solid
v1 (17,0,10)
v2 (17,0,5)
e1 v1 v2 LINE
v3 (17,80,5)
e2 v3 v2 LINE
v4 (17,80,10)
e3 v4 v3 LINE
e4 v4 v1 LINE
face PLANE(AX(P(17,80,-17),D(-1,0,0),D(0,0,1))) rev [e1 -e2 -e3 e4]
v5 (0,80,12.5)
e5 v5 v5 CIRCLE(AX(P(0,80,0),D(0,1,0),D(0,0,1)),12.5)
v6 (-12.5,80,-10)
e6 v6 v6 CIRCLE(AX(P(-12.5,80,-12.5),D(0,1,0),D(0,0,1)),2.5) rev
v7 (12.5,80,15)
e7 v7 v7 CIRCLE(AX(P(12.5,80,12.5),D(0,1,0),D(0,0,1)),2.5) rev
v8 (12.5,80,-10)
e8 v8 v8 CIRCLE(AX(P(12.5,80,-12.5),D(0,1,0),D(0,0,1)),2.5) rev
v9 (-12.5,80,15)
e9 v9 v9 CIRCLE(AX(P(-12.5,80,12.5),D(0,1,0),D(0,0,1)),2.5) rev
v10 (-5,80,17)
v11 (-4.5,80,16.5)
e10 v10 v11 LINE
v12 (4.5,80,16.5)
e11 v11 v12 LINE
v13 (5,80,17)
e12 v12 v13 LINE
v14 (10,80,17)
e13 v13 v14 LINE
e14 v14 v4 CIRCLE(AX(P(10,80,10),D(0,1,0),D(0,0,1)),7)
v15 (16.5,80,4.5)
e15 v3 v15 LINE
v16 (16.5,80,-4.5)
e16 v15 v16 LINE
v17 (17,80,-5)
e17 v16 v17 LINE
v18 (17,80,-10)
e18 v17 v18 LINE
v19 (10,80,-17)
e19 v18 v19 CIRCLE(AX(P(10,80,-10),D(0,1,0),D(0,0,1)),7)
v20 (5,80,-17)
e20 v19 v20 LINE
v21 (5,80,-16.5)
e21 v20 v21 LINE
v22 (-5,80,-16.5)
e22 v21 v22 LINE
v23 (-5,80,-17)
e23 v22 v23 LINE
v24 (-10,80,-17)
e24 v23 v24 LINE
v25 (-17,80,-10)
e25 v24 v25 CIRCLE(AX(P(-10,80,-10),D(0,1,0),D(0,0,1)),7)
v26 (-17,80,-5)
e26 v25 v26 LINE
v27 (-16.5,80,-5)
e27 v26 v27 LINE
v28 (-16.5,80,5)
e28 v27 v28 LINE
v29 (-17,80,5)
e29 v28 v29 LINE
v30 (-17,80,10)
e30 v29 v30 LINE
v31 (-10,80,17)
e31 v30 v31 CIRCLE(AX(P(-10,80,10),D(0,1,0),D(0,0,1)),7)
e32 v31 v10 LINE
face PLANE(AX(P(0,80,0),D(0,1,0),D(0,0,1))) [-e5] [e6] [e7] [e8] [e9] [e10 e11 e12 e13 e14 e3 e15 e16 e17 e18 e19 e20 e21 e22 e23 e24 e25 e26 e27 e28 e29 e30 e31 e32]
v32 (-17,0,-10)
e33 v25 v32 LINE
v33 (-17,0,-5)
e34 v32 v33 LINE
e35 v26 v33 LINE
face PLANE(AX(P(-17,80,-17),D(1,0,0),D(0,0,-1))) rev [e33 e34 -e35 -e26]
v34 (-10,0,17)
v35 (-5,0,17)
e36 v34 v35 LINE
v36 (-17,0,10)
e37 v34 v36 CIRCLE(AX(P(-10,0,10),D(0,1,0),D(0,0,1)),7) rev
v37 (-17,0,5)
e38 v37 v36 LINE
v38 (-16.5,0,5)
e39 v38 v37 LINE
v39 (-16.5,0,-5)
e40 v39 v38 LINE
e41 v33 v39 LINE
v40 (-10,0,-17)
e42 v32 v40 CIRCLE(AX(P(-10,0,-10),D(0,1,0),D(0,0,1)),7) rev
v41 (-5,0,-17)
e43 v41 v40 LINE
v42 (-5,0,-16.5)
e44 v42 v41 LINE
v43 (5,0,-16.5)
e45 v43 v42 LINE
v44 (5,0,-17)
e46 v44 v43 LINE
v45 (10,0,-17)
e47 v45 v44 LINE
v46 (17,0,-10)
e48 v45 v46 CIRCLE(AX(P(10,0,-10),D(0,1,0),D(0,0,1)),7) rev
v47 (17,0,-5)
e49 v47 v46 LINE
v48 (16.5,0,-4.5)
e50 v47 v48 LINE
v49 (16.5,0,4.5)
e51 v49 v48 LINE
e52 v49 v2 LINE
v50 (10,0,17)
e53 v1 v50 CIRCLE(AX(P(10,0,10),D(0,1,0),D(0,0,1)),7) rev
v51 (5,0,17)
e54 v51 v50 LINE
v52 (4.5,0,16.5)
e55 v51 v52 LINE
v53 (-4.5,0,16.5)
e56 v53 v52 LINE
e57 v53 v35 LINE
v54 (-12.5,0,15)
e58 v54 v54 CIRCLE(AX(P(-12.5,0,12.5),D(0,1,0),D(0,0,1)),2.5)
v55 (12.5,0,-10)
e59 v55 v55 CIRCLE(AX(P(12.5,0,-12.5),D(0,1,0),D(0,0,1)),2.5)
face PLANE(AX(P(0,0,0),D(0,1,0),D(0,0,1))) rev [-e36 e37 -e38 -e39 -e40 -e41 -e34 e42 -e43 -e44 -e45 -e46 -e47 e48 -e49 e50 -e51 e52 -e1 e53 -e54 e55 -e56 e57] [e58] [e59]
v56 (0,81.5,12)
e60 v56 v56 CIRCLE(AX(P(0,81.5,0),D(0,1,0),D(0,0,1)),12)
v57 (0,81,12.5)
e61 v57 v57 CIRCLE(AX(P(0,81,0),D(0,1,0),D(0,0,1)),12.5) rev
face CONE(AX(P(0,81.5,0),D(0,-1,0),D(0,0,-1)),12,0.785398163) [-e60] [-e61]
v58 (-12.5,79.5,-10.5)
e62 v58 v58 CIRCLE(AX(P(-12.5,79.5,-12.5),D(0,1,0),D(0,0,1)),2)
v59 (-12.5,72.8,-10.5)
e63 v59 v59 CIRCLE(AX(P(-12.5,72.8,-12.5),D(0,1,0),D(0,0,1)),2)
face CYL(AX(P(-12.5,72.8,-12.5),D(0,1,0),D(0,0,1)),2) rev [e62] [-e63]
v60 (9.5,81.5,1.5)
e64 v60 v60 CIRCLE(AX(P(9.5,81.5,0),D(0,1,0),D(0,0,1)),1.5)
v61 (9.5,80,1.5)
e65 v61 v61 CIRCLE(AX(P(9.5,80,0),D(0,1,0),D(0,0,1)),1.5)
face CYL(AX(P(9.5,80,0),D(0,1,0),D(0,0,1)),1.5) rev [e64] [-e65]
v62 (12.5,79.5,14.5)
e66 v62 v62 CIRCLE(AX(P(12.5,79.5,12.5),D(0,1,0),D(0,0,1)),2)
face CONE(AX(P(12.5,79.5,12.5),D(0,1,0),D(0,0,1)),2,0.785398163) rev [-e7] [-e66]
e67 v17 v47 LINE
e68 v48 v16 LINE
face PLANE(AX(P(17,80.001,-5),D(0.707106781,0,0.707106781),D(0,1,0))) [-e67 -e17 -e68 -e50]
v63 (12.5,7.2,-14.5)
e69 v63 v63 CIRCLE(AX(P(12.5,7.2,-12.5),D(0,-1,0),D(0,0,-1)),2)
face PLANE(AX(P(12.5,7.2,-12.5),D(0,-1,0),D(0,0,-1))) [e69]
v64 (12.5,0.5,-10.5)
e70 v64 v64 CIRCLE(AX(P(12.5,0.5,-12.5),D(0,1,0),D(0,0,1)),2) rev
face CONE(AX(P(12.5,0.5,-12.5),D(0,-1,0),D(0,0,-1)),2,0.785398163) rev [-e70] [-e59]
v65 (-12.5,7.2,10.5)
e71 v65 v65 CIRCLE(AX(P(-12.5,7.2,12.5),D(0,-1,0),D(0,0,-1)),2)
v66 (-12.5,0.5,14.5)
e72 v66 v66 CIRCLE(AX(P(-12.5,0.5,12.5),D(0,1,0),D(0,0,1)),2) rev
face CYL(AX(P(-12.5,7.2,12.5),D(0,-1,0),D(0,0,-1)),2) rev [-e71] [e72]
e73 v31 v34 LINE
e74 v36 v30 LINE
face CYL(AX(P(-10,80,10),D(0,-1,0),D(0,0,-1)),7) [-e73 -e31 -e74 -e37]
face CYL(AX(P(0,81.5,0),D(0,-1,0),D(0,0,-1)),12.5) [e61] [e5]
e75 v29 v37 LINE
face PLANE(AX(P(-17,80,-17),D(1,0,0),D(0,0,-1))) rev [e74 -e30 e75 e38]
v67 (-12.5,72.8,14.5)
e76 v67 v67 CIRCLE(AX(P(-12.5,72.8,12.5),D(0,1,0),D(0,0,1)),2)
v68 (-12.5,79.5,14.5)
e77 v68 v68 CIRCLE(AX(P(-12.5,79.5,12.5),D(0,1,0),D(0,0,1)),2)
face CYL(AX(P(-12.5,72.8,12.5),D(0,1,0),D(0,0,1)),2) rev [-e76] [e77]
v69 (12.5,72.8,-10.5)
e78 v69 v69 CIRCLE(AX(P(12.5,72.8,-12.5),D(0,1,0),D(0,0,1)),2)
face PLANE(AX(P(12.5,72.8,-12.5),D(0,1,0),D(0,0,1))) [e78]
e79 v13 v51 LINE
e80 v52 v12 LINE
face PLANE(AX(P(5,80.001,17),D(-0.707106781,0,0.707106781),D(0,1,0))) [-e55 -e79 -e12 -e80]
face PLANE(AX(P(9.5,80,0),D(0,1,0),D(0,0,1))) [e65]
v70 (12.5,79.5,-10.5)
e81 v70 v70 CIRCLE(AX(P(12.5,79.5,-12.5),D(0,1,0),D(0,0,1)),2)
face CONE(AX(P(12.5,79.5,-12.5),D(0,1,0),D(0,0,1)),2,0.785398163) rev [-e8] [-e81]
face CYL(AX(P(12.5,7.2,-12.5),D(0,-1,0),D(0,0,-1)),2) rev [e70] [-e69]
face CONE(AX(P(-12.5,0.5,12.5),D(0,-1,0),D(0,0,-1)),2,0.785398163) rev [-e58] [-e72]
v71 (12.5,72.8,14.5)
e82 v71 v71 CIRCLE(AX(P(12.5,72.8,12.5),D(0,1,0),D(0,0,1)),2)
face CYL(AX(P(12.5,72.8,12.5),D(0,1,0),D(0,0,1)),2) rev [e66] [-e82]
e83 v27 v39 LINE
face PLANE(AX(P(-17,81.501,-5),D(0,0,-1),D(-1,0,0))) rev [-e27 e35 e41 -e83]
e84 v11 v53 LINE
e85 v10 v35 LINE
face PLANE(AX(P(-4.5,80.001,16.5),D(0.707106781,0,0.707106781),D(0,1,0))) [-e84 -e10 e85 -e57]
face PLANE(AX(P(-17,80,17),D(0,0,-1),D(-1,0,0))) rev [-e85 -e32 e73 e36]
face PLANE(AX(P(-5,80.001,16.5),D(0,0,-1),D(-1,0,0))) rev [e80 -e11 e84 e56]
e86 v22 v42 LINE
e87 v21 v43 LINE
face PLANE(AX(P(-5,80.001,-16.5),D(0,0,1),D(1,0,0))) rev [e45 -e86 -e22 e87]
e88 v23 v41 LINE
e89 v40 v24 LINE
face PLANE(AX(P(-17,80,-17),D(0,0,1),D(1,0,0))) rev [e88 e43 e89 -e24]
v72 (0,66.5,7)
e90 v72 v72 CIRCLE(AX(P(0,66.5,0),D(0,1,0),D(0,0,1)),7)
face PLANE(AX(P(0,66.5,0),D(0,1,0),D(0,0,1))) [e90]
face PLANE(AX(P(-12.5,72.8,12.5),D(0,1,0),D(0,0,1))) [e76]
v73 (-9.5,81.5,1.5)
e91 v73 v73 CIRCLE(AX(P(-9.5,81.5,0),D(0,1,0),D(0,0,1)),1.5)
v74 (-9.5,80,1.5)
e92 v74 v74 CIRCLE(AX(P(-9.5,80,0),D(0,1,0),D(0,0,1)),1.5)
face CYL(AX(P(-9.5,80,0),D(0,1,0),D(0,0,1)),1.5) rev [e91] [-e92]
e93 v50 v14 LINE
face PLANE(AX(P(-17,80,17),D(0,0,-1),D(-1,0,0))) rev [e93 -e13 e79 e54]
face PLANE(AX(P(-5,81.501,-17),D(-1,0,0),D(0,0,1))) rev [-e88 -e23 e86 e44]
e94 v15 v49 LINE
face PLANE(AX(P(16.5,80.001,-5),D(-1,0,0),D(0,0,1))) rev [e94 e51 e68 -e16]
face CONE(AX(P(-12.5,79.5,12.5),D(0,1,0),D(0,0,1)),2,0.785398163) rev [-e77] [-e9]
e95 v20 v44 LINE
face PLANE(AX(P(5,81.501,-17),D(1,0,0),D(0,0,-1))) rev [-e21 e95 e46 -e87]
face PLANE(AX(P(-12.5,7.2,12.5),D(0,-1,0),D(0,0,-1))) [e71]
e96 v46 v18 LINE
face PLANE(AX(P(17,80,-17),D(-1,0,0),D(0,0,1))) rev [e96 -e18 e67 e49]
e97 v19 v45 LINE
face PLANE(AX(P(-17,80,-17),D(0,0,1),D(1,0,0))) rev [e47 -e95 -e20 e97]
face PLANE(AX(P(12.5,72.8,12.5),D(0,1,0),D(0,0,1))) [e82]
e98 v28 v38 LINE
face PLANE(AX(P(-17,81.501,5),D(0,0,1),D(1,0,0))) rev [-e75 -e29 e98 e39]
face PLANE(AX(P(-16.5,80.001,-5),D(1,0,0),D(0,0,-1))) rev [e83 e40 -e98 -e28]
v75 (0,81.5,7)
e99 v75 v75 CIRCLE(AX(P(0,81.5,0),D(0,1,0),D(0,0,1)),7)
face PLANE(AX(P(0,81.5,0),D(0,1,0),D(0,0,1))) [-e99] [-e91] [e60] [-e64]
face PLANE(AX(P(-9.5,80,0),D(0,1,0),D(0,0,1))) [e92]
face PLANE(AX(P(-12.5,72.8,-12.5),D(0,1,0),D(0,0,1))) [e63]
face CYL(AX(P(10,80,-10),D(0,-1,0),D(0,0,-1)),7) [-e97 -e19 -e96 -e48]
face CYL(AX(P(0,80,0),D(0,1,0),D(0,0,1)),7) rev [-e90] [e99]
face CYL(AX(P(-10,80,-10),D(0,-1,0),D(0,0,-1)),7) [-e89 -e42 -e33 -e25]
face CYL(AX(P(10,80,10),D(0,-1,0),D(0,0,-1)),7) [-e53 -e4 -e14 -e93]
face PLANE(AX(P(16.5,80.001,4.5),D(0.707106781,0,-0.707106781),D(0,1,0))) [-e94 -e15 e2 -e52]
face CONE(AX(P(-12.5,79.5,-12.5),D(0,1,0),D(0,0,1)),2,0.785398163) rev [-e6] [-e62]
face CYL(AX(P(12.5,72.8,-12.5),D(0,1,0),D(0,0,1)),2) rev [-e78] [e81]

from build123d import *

# Parameters (mm, degrees)
SKETCH_1_W           = 34
SKETCH_1_H           = 34
EXTRUDE_1_DEPTH      = 80
FILLET_1_R           = 7
CUT_EXTRUDE_8_REACH  = 85.534
SKETCH_13_W          = 10
SKETCH_13_H          = 0.5
SKETCH_13_W_2        = 0.5
SKETCH_13_H_2        = 10
CHAMFER_1_SIZE       = 0.5
SKETCH_18_R          = 2
CUT_EXTRUDE_9_DEPTH  = 7.2
CHAMFER_2_SIZE       = 0.5
CUT_EXTRUDE_START    = -7.2
SKETCH_19_R          = 2
CUT_EXTRUDE_10_DEPTH = 7.2
CHAMFER_3_SIZE       = 0.5
SKETCH_20_R          = 12.5
EXTRUDE_2_DEPTH      = 1.5
CHAMFER_4_SIZE       = 0.5
SKETCH_21_R          = 7
SKETCH_21_R_2        = 1.5
CUT_EXTRUDE_11_DEPTH = 1.5
SKETCH_23_R          = 7
CUT_EXTRUDE_12_DEPTH = 13.5
CUT_EXTRUDE_START_2  = -80
SKETCH_10_W          = 10
SKETCH_10_H          = 0.5
CUT_EXTRUDE_4_DEPTH  = 80
SKETCH_12_W          = 0.5
SKETCH_12_H          = 10
CUT_EXTRUDE_5_DEPTH  = 80


with BuildPart() as part:
    # ｽｹｯﾁ1 → ﾎﾞｽ - 押し出し1 (new body)
    with BuildSketch(Plane(origin=(0, 0, 0), x_dir=(1, 0, 0), z_dir=(0, 1, 0))):
        Rectangle(SKETCH_1_W, SKETCH_1_H)
    extrude(amount=EXTRUDE_1_DEPTH)

    # ﾌｨﾚｯﾄ1
    fillet_1_edges = [part.edges().sort_by_distance(p)[0] for p in [
        (-17, 40, -17),
        (17, 40, -17),
        (17, 40, 17),
        (-17, 40, 17),
    ]]
    fillet(fillet_1_edges, radius=FILLET_1_R)

    # ｽｹｯﾁ13 → ｶｯﾄ - 押し出し8 (cut, up to next)
    with BuildSketch(Plane.XZ, mode=Mode.PRIVATE) as cut_extrude_8_sk1:
        with Locations((0, 16.75)):
            Rectangle(SKETCH_13_W, SKETCH_13_H)
    cut_extrude_8_tool1 = extrude(cut_extrude_8_sk1.sketch, amount=-CUT_EXTRUDE_8_REACH, mode=Mode.PRIVATE) & part.part
    # ｽｹｯﾁ13 → ｶｯﾄ - 押し出し8 (cut, up to next)
    with BuildSketch(Plane.XZ, mode=Mode.PRIVATE) as cut_extrude_8_sk2:
        with Locations((-16.75, 0)):
            Rectangle(SKETCH_13_W_2, SKETCH_13_H_2)
    cut_extrude_8_tool2 = extrude(cut_extrude_8_sk2.sketch, amount=-CUT_EXTRUDE_8_REACH, mode=Mode.PRIVATE) & part.part
    # ｽｹｯﾁ13 → ｶｯﾄ - 押し出し8 (cut, up to next)
    with BuildSketch(Plane.XZ, mode=Mode.PRIVATE) as cut_extrude_8_sk3:
        with Locations((0, -16.75)):
            Rectangle(SKETCH_13_W, SKETCH_13_H)
    cut_extrude_8_tool3 = extrude(cut_extrude_8_sk3.sketch, amount=-CUT_EXTRUDE_8_REACH, mode=Mode.PRIVATE) & part.part
    # ｽｹｯﾁ13 → ｶｯﾄ - 押し出し8 (cut, up to next)
    with BuildSketch(Plane.XZ, mode=Mode.PRIVATE) as cut_extrude_8_sk4:
        with Locations((16.75, 0)):
            Rectangle(SKETCH_13_W_2, SKETCH_13_H_2)
    cut_extrude_8_tool4 = extrude(cut_extrude_8_sk4.sketch, amount=-CUT_EXTRUDE_8_REACH, mode=Mode.PRIVATE) & part.part
    add(cut_extrude_8_tool1.solids().sort_by_distance((0, 0, 16.75))[0], mode=Mode.SUBTRACT)
    add(cut_extrude_8_tool2.solids().sort_by_distance((-16.75, 0, 0))[0], mode=Mode.SUBTRACT)
    add(cut_extrude_8_tool3.solids().sort_by_distance((0, 0, -16.75))[0], mode=Mode.SUBTRACT)
    add(cut_extrude_8_tool4.solids().sort_by_distance((16.75, 0, 0))[0], mode=Mode.SUBTRACT)

    # 面取り1
    chamfer_1_edges = [part.edges().sort_by_distance(p)[0] for p in [
        (-5, 40, 16.5),
        (5, 40, 16.5),
        (16.5, 40, 5),
        (16.5, 40, -5),
        (5, 40, -16.5),
        (-5, 40, -16.5),
        (-16.5, 40, -5),
        (-16.5, 40, 5),
    ]]
    chamfer(chamfer_1_edges, length=CHAMFER_1_SIZE - 0.0001)  # a hair under: the kernel refuses the full size

    # ｽｹｯﾁ18 → ｶｯﾄ - 押し出し9 (cut)
    with BuildSketch(Plane.XZ):
        with Locations(Location((12.5, -12.5, 0), (0, 0, 270))):
            Circle(SKETCH_18_R)
        with Locations(Location((-12.5, 12.5, 0), (0, 0, 270))):
            Circle(SKETCH_18_R)
    extrude(amount=-CUT_EXTRUDE_9_DEPTH, mode=Mode.SUBTRACT)

    # 面取り2
    chamfer_2_edges = [part.edges().sort_by_distance(p)[0] for p in [
        (12.5, 0, -10.5),
        (-12.5, 0, 14.5),
    ]]
    chamfer(chamfer_2_edges, length=CHAMFER_2_SIZE)

    # ｽｹｯﾁ19 → ｶｯﾄ - 押し出し10 (cut)
    with BuildSketch(Plane(origin=(0, 80, 0), x_dir=(1, 0, 0), z_dir=(0, 1, 0)).offset(CUT_EXTRUDE_START)):
        with Locations(Location((-12.5, -12.5, 0), (0, 0, 90))):
            Circle(SKETCH_19_R)
        with Locations(Location((-12.5, 12.5, 0), (0, 0, 270))):
            Circle(SKETCH_19_R)
        with Locations(Location((12.5, 12.5, 0), (0, 0, 90))):
            Circle(SKETCH_19_R)
        with Locations(Location((12.5, -12.5, 0), (0, 0, 270))):
            Circle(SKETCH_19_R)
    extrude(amount=CUT_EXTRUDE_10_DEPTH, mode=Mode.SUBTRACT)

    # 面取り3
    chamfer_3_edges = [part.edges().sort_by_distance(p)[0] for p in [
        (-12.5, 80, -14.5),
        (-12.5, 80, 14.5),
        (12.5, 80, -10.5),
        (12.5, 80, 10.5),
    ]]
    chamfer(chamfer_3_edges, length=CHAMFER_3_SIZE)

    # ｽｹｯﾁ20 → ﾎﾞｽ - 押し出し2 (add)
    with BuildSketch(Plane(origin=(0, 80, 0), x_dir=(1, 0, 0), z_dir=(0, 1, 0))):
        with Locations(Location((0, 0, 0), (0, 0, 270))):
            Circle(SKETCH_20_R)
    extrude(amount=EXTRUDE_2_DEPTH)

    # 面取り4
    chamfer_4_edges = [part.edges().sort_by_distance(p)[0] for p in [
        (0, 81.5, -12.5),
    ]]
    chamfer(chamfer_4_edges, length=CHAMFER_4_SIZE)

    # ｽｹｯﾁ21 → ｶｯﾄ - 押し出し11 (cut)
    with BuildSketch(Plane(origin=(0, 81.5, 0), x_dir=(1, 0, 0), z_dir=(0, 1, 0))):
        with Locations(Location((0, 0, 0), (0, 0, 270))):
            Circle(SKETCH_21_R)
        with Locations(Location((9.5, 0, 0), (0, 0, 270))):
            Circle(SKETCH_21_R_2)
        with Locations(Location((-9.5, 0, 0), (0, 0, 270))):
            Circle(SKETCH_21_R_2)
    extrude(amount=-CUT_EXTRUDE_11_DEPTH, mode=Mode.SUBTRACT)

    # ｽｹｯﾁ23 → ｶｯﾄ - 押し出し12 (cut)
    with BuildSketch(Plane(origin=(0, 80, 0), x_dir=(1, 0, 0), z_dir=(0, 1, 0))):
        with Locations(Location((0, 0, 0), (0, 0, 270))):
            Circle(SKETCH_23_R)
    extrude(amount=-CUT_EXTRUDE_12_DEPTH, mode=Mode.SUBTRACT)

    # ｽｹｯﾁ10 → ｶｯﾄ - 押し出し4 (cut)
    with BuildSketch(Plane.XZ.offset(CUT_EXTRUDE_START_2)):
        with Locations((0, -16.75)):
            Rectangle(SKETCH_10_W, SKETCH_10_H)
    extrude(amount=CUT_EXTRUDE_4_DEPTH, mode=Mode.SUBTRACT)

    # ｽｹｯﾁ12 → ｶｯﾄ - 押し出し5 (cut)
    with BuildSketch(Plane.XZ.offset(CUT_EXTRUDE_START_2)):
        with Locations((-16.75, 0)):
            Rectangle(SKETCH_12_W, SKETCH_12_H)
    extrude(amount=CUT_EXTRUDE_5_DEPTH, mode=Mode.SUBTRACT)


solid = part.part
